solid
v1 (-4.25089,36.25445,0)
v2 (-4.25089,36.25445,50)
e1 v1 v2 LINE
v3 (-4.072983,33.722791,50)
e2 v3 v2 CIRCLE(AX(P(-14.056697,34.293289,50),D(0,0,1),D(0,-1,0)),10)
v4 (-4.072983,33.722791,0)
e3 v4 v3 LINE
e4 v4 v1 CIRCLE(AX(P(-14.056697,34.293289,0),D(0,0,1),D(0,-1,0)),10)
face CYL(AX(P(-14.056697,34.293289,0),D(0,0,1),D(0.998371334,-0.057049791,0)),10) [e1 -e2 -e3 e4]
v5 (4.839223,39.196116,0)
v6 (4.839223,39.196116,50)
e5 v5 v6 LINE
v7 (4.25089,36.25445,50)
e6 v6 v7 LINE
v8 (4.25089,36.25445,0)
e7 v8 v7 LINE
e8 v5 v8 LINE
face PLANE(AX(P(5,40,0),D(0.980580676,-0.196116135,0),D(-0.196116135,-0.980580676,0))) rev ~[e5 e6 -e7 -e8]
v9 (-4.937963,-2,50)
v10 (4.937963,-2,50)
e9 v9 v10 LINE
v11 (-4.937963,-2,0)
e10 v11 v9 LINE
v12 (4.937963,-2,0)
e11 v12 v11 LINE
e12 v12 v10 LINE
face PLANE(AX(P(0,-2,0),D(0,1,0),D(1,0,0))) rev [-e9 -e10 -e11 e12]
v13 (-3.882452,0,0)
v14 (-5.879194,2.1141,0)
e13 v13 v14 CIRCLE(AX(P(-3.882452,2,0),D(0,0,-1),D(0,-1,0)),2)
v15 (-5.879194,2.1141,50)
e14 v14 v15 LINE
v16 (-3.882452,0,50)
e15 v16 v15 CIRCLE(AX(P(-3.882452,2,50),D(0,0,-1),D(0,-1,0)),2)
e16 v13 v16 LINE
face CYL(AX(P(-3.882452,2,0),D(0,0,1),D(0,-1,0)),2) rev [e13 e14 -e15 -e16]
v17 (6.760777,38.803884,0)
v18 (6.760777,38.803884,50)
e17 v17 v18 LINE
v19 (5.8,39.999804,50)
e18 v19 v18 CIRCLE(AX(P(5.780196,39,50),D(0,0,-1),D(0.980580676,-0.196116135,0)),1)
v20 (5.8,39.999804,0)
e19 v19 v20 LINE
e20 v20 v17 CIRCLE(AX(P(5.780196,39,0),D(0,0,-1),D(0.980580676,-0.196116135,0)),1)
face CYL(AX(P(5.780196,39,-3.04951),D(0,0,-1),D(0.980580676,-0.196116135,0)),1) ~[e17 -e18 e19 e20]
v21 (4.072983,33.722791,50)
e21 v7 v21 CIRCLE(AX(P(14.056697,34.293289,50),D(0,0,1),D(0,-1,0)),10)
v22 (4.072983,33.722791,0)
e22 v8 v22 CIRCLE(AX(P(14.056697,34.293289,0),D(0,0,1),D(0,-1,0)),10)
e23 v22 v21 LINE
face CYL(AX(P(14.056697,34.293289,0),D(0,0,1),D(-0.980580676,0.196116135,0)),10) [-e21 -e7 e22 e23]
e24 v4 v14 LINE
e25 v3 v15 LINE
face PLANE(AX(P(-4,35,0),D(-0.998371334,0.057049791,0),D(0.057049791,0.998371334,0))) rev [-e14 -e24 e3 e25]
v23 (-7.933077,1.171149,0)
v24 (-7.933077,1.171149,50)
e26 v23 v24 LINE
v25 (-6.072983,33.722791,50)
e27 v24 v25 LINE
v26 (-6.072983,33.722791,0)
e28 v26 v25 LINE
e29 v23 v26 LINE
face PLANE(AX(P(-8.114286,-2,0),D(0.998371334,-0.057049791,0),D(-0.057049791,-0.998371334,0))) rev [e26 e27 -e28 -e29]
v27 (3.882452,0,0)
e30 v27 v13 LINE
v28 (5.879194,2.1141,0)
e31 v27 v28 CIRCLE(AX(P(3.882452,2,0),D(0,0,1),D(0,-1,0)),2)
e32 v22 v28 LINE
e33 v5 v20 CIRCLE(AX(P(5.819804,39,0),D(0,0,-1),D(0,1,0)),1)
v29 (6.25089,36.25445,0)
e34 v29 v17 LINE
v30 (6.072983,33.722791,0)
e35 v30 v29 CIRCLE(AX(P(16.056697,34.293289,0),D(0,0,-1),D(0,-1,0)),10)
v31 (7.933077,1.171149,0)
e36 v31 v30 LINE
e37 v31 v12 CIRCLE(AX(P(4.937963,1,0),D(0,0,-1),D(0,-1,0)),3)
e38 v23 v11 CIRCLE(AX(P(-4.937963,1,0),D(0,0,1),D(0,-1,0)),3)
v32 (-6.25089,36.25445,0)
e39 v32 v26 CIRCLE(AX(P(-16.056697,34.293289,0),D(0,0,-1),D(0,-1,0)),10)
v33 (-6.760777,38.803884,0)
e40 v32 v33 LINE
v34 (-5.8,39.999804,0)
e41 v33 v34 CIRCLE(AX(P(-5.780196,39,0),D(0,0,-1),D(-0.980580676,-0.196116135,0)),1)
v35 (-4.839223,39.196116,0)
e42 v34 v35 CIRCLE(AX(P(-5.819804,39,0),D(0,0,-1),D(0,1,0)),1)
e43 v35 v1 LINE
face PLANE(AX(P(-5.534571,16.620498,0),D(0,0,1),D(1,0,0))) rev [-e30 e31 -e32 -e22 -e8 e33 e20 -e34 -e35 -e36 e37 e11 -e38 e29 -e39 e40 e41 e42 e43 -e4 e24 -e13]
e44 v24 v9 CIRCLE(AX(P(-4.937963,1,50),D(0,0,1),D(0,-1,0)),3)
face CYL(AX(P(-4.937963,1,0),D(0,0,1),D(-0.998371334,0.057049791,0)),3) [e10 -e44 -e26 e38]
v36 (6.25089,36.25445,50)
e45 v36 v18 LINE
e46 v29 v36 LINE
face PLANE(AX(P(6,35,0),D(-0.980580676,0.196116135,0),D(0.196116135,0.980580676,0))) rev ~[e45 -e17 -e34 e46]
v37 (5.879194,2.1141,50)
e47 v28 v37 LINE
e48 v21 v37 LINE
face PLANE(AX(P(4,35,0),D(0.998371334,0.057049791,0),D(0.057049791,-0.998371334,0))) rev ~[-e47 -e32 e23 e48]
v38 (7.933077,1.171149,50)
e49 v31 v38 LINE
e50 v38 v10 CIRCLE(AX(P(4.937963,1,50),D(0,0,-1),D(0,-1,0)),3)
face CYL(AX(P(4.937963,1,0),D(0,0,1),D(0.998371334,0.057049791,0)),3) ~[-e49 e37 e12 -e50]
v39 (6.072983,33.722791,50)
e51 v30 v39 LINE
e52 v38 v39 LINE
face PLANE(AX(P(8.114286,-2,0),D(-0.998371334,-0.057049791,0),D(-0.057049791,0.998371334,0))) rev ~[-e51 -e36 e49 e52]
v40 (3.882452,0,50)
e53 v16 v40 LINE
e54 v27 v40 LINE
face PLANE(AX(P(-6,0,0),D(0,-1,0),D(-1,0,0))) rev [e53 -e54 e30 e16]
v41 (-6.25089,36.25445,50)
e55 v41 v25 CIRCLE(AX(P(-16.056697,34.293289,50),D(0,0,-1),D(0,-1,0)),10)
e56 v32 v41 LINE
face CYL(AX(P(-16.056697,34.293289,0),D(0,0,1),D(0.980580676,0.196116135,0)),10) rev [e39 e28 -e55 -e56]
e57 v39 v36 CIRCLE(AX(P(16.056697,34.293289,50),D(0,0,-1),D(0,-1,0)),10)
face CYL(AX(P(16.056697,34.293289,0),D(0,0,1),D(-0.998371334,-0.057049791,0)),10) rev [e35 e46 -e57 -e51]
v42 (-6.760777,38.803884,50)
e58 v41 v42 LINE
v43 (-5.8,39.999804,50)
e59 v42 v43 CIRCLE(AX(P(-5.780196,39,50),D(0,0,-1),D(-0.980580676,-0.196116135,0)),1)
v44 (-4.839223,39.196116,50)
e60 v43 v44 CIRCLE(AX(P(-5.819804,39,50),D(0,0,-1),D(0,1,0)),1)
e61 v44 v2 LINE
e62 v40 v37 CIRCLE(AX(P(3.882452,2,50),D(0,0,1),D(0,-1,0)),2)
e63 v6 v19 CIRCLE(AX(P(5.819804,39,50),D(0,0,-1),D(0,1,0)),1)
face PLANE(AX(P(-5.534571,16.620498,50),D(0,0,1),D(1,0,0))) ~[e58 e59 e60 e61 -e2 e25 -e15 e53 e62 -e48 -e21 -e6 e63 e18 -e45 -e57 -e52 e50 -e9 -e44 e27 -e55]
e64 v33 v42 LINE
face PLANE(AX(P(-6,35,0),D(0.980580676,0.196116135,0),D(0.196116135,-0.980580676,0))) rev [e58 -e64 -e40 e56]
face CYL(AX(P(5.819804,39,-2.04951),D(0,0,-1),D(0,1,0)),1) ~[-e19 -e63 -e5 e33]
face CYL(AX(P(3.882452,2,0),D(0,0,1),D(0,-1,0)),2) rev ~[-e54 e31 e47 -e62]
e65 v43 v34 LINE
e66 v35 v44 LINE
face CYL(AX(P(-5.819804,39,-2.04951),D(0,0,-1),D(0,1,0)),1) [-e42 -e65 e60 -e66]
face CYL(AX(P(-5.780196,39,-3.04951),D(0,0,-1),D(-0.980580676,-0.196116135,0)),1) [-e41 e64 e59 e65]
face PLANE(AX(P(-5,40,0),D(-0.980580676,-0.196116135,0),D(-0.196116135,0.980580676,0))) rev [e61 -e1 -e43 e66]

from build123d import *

# Parameters (mm, degrees)
F1_DEPTH    = 50
F3_R        = 2
F4_R        = 3
F5_R        = 2
F6_R        = 3
F7_T1_DEPTH = 54.0990195136
F7_T3_DEPTH = 56.0990195136
F8_R        = 10


# Not quite as in the source:
# - a fillet or chamfer that OpenCascade refuses, or shapes differently, is made with other operations: its cross-section is extruded or revolved along the edge and cut away or added


with BuildPart() as f1:
    # F0 (on Top) → F1 (new body)
    with BuildSketch(Plane.XY):
        Polygon((6, 0), (0, 0), (0, -2), (8.1142857143, -2), (6, 35), (7, 40), (5, 40), (4, 35), align=None)
    extrude(amount=F1_DEPTH)

    # F2: F1 across face


with BuildPart() as f1_1:
    add(f1.part)
    add(f1.part.mirror(Plane(origin=(0, -1, 25), x_dir=(0, -1, 0), z_dir=(-1, 0, 0))))

    # F3
    f3_edges = [f1_1.edges().sort_by_distance(p)[0] for p in [
        (6, 0, 25),
    ]]
    fillet(f3_edges, radius=F3_R)

    # F4
    f4_edges = [f1_1.edges().sort_by_distance(p)[0] for p in [
        (8.114286, -2, 25),
    ]]
    fillet(f4_edges, radius=F4_R)

    # F5
    f5_edges = [f1_1.edges().sort_by_distance(p)[0] for p in [
        (-6, 0, 25),
    ]]
    fillet(f5_edges, radius=F5_R)

    # F6
    f6_edges = [f1_1.edges().sort_by_distance(p)[0] for p in [
        (-8.114286, -2, 25),
    ]]
    fillet(f6_edges, radius=F6_R)

    # F7: fillet of radius 1 on 4 edges, made by hand

    # F7_s2 → F7_t1 (cut)
    with BuildSketch(Plane.XY.offset(-2.0495097568)):
        with BuildLine():
            ThreePointArc((-5.8198039027, 40), (-5.1858149971, 39.7733421413), (-4.839223227, 39.1961161351))
            Line((-4.839223227, 39.1961161351), (-5, 40))
            Line((-5, 40), (-5.8198039027, 40))
        make_face()
        with BuildLine():
            ThreePointArc((5.8198039027, 40), (5.1858149971, 39.7733421413), (4.839223227, 39.1961161351))
            Line((4.839223227, 39.1961161351), (5, 40))
            Line((5, 40), (5.8198039027, 40))
        make_face()
    extrude(amount=F7_T1_DEPTH, mode=Mode.SUBTRACT)

    # F7_s4 → F7_t3 (cut)
    with BuildSketch(Plane.XY.offset(-3.0495097568)):
        with BuildLine():
            ThreePointArc((-6.760776773, 38.8038838649), (-6.5535382386, 39.6339889056), (-5.7801960973, 40))
            Line((-5.7801960973, 40), (-7, 40))
            Line((-7, 40), (-6.760776773, 38.8038838649))
        make_face()
        with BuildLine():
            ThreePointArc((6.760776773, 38.8038838649), (6.5535382386, 39.6339889056), (5.7801960973, 40))
            Line((5.7801960973, 40), (7, 40))
            Line((7, 40), (6.760776773, 38.8038838649))
        make_face()
    extrude(amount=F7_T3_DEPTH, mode=Mode.SUBTRACT)

    # F8
    f8_edges = [f1_1.edges().sort_by_distance(p)[0] for p in [
        (-4, 35, 25),
        (4, 35, 25),
        (6, 35, 25),
        (-6, 35, 25),
    ]]
    fillet(f8_edges, radius=F8_R)


solid = f1_1.part
